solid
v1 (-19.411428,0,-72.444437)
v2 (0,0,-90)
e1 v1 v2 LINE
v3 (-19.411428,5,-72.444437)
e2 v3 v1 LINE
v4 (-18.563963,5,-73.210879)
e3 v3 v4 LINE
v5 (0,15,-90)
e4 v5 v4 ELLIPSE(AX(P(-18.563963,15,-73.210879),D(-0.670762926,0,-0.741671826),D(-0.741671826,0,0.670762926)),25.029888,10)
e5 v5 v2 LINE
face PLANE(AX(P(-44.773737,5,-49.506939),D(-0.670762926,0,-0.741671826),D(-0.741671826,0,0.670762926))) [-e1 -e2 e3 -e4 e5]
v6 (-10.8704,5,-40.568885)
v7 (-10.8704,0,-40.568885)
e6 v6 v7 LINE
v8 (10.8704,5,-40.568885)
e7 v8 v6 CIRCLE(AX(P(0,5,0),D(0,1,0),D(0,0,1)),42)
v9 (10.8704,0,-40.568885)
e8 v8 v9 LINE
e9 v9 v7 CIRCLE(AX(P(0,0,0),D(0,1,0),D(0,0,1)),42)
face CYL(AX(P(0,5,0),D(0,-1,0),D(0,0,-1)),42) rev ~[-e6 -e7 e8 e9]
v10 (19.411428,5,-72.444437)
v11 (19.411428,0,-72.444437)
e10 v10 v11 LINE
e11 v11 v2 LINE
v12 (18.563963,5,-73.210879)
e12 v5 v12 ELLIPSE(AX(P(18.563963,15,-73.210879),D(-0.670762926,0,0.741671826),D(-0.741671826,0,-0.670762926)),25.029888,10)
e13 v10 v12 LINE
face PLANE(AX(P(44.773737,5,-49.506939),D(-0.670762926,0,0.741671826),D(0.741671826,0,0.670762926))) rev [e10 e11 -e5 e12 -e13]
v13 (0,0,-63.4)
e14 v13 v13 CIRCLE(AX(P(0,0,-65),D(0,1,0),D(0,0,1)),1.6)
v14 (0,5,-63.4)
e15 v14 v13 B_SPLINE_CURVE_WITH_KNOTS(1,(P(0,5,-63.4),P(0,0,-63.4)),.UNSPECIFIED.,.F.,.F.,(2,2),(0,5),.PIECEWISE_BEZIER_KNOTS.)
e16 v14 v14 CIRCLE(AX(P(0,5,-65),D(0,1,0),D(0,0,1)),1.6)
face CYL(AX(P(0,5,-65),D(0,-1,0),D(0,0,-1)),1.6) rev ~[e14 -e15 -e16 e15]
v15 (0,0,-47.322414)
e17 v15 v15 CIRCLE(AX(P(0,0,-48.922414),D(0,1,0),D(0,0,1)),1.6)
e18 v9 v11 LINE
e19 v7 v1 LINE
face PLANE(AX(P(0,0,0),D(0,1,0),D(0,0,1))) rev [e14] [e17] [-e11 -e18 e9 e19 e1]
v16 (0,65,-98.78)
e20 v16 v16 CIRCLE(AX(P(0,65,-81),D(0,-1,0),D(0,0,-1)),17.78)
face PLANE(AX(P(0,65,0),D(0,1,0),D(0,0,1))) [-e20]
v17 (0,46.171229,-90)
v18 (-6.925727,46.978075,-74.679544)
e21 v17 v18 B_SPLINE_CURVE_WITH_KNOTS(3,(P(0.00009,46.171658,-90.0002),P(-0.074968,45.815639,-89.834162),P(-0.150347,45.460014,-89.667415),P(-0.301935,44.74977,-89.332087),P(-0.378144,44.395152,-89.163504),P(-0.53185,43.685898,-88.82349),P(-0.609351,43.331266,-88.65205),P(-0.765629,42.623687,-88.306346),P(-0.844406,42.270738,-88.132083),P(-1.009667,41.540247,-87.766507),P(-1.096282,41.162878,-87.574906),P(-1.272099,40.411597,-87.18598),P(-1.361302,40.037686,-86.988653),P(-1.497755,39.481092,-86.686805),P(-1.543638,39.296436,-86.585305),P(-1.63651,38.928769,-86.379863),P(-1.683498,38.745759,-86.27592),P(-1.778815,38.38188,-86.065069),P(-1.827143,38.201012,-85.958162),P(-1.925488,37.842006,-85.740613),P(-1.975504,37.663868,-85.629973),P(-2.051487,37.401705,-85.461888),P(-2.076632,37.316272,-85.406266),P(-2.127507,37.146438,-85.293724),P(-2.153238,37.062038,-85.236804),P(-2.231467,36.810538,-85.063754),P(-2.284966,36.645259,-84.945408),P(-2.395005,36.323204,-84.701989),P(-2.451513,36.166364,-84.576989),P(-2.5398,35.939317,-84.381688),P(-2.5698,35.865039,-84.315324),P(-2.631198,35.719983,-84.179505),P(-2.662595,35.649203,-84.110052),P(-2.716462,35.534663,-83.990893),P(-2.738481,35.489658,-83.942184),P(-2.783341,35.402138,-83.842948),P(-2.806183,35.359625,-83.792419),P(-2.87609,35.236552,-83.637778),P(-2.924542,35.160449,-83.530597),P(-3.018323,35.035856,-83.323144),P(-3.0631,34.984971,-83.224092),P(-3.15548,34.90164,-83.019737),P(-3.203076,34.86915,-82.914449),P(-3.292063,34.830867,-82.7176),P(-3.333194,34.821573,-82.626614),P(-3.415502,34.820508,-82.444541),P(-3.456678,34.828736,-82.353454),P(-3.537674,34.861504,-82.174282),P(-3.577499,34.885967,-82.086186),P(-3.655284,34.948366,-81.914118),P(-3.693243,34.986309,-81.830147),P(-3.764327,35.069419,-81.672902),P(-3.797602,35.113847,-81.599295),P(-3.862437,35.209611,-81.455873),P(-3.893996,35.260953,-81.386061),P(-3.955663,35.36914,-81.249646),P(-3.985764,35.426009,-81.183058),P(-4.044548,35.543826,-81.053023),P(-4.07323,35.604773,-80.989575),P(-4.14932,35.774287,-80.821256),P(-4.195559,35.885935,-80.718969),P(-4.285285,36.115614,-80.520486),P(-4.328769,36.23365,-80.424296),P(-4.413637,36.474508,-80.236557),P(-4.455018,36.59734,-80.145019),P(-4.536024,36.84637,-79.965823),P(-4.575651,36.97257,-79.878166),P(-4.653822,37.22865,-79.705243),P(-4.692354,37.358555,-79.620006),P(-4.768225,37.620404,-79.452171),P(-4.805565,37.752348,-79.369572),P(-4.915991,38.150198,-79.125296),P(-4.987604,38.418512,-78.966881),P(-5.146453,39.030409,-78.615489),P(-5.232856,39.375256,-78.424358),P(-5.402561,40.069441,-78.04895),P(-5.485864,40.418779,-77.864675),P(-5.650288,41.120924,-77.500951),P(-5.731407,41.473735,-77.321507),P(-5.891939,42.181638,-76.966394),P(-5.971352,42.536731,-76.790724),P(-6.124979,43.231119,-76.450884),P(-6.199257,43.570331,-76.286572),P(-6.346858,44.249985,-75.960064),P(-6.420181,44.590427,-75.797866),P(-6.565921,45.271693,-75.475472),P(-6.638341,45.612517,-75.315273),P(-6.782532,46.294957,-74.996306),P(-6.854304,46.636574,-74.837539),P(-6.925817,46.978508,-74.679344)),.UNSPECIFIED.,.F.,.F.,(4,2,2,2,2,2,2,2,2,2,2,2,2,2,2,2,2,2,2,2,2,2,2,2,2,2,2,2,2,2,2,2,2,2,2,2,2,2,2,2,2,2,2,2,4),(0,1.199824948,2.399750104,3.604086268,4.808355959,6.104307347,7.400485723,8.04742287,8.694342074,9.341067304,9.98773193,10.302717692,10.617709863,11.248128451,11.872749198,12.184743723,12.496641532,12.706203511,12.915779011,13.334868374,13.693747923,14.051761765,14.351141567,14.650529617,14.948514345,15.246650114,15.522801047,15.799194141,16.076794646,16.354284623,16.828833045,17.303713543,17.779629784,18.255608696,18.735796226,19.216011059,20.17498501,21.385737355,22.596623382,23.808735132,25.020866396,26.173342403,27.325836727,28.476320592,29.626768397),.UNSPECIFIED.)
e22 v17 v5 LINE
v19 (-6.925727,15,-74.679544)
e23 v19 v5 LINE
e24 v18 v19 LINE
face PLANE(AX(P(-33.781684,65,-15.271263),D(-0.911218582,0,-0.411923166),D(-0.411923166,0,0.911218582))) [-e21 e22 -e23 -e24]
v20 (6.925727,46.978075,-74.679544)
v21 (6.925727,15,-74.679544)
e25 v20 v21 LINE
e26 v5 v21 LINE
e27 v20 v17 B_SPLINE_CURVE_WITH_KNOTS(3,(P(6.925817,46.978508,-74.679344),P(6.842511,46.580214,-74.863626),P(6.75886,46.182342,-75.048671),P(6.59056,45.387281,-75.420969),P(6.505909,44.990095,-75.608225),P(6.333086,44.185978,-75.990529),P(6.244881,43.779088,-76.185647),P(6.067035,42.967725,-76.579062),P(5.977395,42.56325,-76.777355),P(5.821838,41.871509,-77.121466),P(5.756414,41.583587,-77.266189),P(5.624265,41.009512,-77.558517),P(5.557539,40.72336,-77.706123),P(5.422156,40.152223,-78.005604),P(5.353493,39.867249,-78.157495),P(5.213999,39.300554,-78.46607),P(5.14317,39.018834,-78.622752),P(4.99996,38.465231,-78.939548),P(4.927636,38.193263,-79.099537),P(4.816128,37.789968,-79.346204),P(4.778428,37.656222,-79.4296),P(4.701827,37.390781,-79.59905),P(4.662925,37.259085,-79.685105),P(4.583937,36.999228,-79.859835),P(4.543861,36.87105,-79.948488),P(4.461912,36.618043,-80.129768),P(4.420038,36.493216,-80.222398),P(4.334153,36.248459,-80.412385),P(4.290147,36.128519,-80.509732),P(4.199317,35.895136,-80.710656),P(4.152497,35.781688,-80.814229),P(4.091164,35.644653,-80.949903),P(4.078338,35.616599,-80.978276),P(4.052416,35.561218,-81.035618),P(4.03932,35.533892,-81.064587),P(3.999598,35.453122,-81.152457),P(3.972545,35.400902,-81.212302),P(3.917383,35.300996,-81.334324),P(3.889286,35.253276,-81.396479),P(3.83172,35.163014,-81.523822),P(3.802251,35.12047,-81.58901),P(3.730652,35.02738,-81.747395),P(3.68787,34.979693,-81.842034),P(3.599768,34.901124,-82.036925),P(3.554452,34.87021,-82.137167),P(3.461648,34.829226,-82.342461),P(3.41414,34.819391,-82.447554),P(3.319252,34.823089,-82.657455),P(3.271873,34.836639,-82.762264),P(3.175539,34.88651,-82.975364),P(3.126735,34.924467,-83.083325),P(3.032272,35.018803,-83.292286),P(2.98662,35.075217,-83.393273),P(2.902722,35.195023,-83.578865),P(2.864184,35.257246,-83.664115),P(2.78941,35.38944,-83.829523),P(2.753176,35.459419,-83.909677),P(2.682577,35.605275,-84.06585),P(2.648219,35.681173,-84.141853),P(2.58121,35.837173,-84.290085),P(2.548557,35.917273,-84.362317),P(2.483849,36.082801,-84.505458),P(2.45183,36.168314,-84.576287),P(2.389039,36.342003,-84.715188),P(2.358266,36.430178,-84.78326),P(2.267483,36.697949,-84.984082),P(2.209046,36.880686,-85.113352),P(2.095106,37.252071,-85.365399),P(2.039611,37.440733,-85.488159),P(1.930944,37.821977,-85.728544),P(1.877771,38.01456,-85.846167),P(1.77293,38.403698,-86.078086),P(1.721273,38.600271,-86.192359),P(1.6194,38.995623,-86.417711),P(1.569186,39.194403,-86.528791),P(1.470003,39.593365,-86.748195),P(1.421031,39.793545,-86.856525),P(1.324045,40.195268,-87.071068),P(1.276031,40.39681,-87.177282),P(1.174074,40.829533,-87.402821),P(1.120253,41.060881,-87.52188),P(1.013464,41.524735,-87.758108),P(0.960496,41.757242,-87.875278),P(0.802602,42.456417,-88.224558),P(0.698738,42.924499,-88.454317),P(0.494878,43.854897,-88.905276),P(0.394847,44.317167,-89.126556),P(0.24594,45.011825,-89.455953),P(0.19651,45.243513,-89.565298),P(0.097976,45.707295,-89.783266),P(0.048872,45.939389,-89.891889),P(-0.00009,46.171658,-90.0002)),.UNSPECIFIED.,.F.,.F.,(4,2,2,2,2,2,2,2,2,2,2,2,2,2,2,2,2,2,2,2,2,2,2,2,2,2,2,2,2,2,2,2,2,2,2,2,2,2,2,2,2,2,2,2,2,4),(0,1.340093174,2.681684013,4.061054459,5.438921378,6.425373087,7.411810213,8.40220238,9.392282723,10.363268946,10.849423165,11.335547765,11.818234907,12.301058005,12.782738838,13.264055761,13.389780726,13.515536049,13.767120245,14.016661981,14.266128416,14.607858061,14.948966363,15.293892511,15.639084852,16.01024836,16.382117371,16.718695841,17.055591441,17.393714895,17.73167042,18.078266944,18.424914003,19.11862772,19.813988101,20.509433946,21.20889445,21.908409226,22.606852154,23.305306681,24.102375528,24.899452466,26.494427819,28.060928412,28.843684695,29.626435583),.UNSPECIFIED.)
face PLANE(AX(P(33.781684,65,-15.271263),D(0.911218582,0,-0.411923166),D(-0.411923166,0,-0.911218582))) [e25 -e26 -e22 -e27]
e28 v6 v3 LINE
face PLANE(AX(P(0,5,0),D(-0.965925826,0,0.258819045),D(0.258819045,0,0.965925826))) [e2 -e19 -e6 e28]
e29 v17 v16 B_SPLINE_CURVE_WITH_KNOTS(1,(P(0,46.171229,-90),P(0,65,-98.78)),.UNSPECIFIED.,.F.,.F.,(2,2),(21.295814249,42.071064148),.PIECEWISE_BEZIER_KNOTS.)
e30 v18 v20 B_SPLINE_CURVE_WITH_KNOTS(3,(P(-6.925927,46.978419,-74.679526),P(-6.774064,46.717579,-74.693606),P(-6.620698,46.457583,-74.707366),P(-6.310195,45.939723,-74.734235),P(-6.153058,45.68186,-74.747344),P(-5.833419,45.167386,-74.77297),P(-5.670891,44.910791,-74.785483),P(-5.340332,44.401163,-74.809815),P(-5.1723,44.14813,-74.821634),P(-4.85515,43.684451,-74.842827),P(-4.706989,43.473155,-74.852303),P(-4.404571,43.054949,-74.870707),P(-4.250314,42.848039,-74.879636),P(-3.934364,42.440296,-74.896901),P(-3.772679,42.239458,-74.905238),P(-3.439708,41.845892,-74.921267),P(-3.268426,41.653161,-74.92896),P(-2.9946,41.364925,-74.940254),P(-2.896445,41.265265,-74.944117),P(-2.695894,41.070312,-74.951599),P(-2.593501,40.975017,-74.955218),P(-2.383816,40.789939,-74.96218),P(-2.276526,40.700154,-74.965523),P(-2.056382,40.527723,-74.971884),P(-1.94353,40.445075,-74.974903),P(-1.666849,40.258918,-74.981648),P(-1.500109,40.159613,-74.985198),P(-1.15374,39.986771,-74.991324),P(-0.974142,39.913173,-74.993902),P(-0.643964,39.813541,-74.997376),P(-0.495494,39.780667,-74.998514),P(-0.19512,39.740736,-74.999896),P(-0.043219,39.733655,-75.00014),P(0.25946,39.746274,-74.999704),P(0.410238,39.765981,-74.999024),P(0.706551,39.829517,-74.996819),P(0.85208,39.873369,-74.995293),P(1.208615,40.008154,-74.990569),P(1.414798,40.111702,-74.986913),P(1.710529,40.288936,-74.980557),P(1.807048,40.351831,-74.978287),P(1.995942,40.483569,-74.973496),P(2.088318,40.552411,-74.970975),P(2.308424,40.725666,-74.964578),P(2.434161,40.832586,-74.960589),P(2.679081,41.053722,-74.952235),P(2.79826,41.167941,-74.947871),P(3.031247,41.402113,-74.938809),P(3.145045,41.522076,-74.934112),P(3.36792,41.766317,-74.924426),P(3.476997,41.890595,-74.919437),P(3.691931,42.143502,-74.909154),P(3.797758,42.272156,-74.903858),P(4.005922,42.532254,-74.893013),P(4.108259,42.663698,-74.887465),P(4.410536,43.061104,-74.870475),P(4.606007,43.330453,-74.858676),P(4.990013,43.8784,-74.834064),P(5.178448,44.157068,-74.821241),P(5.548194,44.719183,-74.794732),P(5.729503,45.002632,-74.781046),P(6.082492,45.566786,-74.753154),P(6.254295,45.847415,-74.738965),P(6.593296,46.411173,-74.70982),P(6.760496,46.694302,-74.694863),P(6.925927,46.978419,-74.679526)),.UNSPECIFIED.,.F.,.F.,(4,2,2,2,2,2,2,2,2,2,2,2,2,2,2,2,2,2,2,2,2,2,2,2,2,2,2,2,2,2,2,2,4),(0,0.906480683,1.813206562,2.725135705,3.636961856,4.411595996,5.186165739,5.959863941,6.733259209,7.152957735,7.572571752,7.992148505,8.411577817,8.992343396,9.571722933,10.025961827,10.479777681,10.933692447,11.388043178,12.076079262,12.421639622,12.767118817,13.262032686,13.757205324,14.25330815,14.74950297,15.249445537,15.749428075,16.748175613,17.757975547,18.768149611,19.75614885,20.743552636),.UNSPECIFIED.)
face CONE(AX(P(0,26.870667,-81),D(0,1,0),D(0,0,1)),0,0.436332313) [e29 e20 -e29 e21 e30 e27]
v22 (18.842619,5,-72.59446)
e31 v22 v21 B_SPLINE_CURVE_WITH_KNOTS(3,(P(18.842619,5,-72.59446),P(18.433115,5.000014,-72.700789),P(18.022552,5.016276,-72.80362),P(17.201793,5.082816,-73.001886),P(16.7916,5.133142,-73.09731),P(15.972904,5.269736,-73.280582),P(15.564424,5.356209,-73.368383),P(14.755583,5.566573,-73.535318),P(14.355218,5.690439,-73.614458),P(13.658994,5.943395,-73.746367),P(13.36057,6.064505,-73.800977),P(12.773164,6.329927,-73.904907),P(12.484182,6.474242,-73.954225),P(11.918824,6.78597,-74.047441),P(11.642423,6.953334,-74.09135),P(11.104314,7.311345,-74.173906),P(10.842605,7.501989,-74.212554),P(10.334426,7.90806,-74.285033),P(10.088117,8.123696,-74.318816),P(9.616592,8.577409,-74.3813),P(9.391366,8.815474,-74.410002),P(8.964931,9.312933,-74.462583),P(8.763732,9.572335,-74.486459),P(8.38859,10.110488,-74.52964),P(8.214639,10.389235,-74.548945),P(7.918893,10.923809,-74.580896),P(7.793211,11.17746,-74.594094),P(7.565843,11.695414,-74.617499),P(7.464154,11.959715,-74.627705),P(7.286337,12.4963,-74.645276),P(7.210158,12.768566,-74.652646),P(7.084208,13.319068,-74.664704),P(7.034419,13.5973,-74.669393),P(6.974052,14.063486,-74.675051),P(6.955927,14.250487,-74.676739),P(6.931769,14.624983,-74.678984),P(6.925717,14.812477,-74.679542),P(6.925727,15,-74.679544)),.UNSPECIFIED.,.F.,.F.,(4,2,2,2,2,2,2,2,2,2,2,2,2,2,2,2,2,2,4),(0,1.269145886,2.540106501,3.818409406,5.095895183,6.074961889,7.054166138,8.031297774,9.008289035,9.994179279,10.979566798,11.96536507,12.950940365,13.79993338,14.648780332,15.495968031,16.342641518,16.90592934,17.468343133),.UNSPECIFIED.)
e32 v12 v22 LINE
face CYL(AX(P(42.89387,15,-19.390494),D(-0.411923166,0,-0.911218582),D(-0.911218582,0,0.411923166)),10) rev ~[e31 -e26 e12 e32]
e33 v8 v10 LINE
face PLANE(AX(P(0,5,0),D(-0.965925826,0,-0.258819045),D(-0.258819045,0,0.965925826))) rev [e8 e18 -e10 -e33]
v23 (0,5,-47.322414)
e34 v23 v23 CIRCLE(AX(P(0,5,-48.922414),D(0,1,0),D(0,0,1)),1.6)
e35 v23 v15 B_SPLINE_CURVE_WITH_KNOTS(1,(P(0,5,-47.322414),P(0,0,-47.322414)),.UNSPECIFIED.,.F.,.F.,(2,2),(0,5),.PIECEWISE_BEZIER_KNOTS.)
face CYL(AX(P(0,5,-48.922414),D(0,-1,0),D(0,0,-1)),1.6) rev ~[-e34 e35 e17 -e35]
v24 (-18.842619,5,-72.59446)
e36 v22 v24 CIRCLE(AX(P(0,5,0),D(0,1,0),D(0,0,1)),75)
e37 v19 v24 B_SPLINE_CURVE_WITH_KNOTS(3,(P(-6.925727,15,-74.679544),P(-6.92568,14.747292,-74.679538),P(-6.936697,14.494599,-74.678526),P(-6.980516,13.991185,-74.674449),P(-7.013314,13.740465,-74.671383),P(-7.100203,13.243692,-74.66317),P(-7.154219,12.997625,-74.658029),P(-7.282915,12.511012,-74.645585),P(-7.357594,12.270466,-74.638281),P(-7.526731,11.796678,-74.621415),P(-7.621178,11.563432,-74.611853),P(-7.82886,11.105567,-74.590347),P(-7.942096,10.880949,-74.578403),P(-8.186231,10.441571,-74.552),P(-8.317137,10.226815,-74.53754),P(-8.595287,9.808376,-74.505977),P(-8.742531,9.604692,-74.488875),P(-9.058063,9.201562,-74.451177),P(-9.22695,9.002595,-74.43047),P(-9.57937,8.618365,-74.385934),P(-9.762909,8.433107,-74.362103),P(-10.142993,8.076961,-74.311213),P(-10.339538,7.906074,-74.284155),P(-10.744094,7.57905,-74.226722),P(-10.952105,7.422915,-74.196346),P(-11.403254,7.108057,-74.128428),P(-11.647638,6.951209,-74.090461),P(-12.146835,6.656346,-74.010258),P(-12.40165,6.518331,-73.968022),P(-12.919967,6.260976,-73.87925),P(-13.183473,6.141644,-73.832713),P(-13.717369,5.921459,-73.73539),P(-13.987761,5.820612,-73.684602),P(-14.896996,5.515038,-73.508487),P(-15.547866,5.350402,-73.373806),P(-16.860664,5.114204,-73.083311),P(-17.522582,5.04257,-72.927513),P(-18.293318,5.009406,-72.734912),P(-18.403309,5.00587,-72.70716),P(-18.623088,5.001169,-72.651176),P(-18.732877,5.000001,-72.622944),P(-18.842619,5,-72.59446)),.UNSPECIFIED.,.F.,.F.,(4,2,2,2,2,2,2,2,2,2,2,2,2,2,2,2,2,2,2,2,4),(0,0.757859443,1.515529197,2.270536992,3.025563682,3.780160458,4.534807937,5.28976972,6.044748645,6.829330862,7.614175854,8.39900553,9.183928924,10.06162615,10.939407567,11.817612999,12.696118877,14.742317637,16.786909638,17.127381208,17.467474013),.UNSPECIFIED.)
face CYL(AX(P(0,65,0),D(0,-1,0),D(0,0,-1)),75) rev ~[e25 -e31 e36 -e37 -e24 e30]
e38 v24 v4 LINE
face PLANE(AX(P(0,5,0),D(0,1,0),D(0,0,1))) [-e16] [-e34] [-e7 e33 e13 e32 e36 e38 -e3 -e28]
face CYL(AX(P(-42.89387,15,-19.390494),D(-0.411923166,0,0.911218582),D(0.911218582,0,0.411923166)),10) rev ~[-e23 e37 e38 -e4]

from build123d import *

# Parameters (mm, degrees)
SKETCH_1_R      = 1.6
EXTRUDE_1_DEPTH = 5
EXTRUDE_2_DEPTH = 60
FILLET_2_R      = 10
FILLET_3_R      = 10


with BuildPart() as part:
    # 草图1 → 凸台-拉伸1 (new body)
    with BuildSketch(Plane(origin=(0, 0, 0), x_dir=(1, 0, 0), z_dir=(0, 1, 0))):
        with BuildLine():
            ThreePointArc((-10.870399894, 40.568884704), (0, 42), (10.870399894, 40.568884704))
            Line((10.870399894, 40.568884704), (19.411428383, 72.444436972))
            Line((19.411428383, 72.444436972), (0, 90))
            Line((0, 90), (-19.411428383, 72.444436972))
            Line((-19.411428383, 72.444436972), (-10.870399894, 40.568884704))
        make_face()
        with Locations(Location((0, 65, 0), (0, 0, 270))):
            Circle(SKETCH_1_R, mode=Mode.SUBTRACT)
        with Locations(Location((0, 48.92241394, 0), (0, 0, 270))):
            Circle(SKETCH_1_R, mode=Mode.SUBTRACT)
    extrude(amount=EXTRUDE_1_DEPTH)

    # 草图5 → 凸台-拉伸2 (add)
    with BuildSketch(Plane(origin=(0, 5, 0), x_dir=(1, 0, 0), z_dir=(0, 1, 0))):
        with BuildLine():
            Line((0, 90), (-6.925726506, 74.679544136))
            ThreePointArc((-6.925726506, 74.679544136), (0, 75), (6.925726506, 74.679544136))
            Line((6.925726506, 74.679544136), (0, 90))
        make_face()
    extrude(amount=EXTRUDE_2_DEPTH)

    # 旋转1: read off the stored shape, not the designer's step
    # 旋转1: loft between two sections, ruled curve by curve
    revolve_1_from = [
        Edge.make_three_point_arc((1e-09, 34.818833313, -84.706290842), (-3.706290842, 34.818833313, -81.000000001), (0, 34.818833313, -77.293709158)),
        Edge.make_three_point_arc((0, 34.818833313, -77.293709158), (3.706290842, 34.818833313, -81), (1e-09, 34.818833313, -84.706290842)),
    ]
    revolve_1_to = [
        Edge.make_three_point_arc((3e-09, 65, -98.78), (-17.78, 65, -81.000000003), (-2e-09, 65, -63.22)),
        Edge.make_three_point_arc((-2e-09, 65, -63.22), (17.78, 65, -80.999999999), (3e-09, 65, -98.78)),
    ]
    revolve_1 = Solid(Shell([*[Face.make_surface_from_curves(revolve_1_from[k], revolve_1_to[k]) for k in range(2)], Face(Wire(revolve_1_from)), Face(Wire(revolve_1_to))]))
    add(revolve_1)

    # 圆角2
    # the kernel refuses this fillet: 10 mm, written as the material it adds along each edge
    with BuildSketch(Plane(origin=(17.223805664, 5, -51.899079574), x_dir=(0.9112185824712705, 0, -0.4119231663296544), z_dir=(-0.4119231663296544, 0, -0.9112185824712706))) as fillet_2_piece_1_section:
        with BuildLine():
            CenterArc((FILLET_2_R, -FILLET_2_R), FILLET_2_R, 90, 90)
            Line((0, -FILLET_2_R), (0, 0))
            Line((0, 0), (FILLET_2_R, 0))
        make_face()
    fillet_2_piece_1 = extrude(amount=66.813151267, mode=Mode.PRIVATE)
    fillet_2_piece_1 = split(fillet_2_piece_1, bisect_by=Plane(origin=(28.429094155, 5, -64.28892174), z_dir=(-0.6707629255291222, 0, 0.7416718261708566)), keep=Keep.TOP, mode=Mode.PRIVATE)
    fillet_2_piece_1 = split(fillet_2_piece_1, bisect_by=Plane(origin=(-11.378711034, 5, -64.829060887), z_dir=(0.9112185824712704, 0, 0.411923166329655)), keep=Keep.TOP, mode=Mode.PRIVATE)
    fillet_2_piece_1 = fillet_2_piece_1 - Plane(origin=(0, 5, 0), x_dir=(-0.09234302007576177, 0, -0.9957272551473558), z_dir=(0, -1, 0)) * Cylinder(75, 174, mode=Mode.PRIVATE)
    add(fillet_2_piece_1)

    # 圆角3
    # the kernel refuses this fillet: 10 mm, written as the material it adds along each edge
    with BuildSketch(Plane(origin=(10.298079158, 5, -112.780464562), x_dir=(-0.9112185824712703, 0, -0.41192316632965503), z_dir=(-0.411923166329655, 0, 0.9112185824712704))) as fillet_3_piece_1_section:
        with BuildLine():
            CenterArc((FILLET_3_R, -FILLET_3_R), FILLET_3_R, 90, 90)
            Line((0, -FILLET_3_R), (0, 0))
            Line((0, 0), (FILLET_3_R, 0))
        make_face()
    fillet_3_piece_1 = extrude(amount=66.813151267, mode=Mode.PRIVATE)
    fillet_3_piece_1 = split(fillet_3_piece_1, bisect_by=Plane(origin=(16.997698866, 5, -105.372602567), z_dir=(0.6707629255291219, 0, 0.7416718261708569)), keep=Keep.TOP, mode=Mode.PRIVATE)
    fillet_3_piece_1 = fillet_3_piece_1 - Plane(origin=(0, 5, 0), x_dir=(-0.0923430200760307, 0, -0.995727255147331), z_dir=(0, -1, 0)) * Cylinder(75, 174, mode=Mode.PRIVATE)
    fillet_3_piece_1 = split(fillet_3_piece_1, bisect_by=Plane(origin=(-5.668223875, 5, -95.126302894), z_dir=(-0.6707629255289835, 0, 0.7416718261709819)), keep=Keep.TOP, mode=Mode.PRIVATE)
    add(fillet_3_piece_1)


solid = part.part
